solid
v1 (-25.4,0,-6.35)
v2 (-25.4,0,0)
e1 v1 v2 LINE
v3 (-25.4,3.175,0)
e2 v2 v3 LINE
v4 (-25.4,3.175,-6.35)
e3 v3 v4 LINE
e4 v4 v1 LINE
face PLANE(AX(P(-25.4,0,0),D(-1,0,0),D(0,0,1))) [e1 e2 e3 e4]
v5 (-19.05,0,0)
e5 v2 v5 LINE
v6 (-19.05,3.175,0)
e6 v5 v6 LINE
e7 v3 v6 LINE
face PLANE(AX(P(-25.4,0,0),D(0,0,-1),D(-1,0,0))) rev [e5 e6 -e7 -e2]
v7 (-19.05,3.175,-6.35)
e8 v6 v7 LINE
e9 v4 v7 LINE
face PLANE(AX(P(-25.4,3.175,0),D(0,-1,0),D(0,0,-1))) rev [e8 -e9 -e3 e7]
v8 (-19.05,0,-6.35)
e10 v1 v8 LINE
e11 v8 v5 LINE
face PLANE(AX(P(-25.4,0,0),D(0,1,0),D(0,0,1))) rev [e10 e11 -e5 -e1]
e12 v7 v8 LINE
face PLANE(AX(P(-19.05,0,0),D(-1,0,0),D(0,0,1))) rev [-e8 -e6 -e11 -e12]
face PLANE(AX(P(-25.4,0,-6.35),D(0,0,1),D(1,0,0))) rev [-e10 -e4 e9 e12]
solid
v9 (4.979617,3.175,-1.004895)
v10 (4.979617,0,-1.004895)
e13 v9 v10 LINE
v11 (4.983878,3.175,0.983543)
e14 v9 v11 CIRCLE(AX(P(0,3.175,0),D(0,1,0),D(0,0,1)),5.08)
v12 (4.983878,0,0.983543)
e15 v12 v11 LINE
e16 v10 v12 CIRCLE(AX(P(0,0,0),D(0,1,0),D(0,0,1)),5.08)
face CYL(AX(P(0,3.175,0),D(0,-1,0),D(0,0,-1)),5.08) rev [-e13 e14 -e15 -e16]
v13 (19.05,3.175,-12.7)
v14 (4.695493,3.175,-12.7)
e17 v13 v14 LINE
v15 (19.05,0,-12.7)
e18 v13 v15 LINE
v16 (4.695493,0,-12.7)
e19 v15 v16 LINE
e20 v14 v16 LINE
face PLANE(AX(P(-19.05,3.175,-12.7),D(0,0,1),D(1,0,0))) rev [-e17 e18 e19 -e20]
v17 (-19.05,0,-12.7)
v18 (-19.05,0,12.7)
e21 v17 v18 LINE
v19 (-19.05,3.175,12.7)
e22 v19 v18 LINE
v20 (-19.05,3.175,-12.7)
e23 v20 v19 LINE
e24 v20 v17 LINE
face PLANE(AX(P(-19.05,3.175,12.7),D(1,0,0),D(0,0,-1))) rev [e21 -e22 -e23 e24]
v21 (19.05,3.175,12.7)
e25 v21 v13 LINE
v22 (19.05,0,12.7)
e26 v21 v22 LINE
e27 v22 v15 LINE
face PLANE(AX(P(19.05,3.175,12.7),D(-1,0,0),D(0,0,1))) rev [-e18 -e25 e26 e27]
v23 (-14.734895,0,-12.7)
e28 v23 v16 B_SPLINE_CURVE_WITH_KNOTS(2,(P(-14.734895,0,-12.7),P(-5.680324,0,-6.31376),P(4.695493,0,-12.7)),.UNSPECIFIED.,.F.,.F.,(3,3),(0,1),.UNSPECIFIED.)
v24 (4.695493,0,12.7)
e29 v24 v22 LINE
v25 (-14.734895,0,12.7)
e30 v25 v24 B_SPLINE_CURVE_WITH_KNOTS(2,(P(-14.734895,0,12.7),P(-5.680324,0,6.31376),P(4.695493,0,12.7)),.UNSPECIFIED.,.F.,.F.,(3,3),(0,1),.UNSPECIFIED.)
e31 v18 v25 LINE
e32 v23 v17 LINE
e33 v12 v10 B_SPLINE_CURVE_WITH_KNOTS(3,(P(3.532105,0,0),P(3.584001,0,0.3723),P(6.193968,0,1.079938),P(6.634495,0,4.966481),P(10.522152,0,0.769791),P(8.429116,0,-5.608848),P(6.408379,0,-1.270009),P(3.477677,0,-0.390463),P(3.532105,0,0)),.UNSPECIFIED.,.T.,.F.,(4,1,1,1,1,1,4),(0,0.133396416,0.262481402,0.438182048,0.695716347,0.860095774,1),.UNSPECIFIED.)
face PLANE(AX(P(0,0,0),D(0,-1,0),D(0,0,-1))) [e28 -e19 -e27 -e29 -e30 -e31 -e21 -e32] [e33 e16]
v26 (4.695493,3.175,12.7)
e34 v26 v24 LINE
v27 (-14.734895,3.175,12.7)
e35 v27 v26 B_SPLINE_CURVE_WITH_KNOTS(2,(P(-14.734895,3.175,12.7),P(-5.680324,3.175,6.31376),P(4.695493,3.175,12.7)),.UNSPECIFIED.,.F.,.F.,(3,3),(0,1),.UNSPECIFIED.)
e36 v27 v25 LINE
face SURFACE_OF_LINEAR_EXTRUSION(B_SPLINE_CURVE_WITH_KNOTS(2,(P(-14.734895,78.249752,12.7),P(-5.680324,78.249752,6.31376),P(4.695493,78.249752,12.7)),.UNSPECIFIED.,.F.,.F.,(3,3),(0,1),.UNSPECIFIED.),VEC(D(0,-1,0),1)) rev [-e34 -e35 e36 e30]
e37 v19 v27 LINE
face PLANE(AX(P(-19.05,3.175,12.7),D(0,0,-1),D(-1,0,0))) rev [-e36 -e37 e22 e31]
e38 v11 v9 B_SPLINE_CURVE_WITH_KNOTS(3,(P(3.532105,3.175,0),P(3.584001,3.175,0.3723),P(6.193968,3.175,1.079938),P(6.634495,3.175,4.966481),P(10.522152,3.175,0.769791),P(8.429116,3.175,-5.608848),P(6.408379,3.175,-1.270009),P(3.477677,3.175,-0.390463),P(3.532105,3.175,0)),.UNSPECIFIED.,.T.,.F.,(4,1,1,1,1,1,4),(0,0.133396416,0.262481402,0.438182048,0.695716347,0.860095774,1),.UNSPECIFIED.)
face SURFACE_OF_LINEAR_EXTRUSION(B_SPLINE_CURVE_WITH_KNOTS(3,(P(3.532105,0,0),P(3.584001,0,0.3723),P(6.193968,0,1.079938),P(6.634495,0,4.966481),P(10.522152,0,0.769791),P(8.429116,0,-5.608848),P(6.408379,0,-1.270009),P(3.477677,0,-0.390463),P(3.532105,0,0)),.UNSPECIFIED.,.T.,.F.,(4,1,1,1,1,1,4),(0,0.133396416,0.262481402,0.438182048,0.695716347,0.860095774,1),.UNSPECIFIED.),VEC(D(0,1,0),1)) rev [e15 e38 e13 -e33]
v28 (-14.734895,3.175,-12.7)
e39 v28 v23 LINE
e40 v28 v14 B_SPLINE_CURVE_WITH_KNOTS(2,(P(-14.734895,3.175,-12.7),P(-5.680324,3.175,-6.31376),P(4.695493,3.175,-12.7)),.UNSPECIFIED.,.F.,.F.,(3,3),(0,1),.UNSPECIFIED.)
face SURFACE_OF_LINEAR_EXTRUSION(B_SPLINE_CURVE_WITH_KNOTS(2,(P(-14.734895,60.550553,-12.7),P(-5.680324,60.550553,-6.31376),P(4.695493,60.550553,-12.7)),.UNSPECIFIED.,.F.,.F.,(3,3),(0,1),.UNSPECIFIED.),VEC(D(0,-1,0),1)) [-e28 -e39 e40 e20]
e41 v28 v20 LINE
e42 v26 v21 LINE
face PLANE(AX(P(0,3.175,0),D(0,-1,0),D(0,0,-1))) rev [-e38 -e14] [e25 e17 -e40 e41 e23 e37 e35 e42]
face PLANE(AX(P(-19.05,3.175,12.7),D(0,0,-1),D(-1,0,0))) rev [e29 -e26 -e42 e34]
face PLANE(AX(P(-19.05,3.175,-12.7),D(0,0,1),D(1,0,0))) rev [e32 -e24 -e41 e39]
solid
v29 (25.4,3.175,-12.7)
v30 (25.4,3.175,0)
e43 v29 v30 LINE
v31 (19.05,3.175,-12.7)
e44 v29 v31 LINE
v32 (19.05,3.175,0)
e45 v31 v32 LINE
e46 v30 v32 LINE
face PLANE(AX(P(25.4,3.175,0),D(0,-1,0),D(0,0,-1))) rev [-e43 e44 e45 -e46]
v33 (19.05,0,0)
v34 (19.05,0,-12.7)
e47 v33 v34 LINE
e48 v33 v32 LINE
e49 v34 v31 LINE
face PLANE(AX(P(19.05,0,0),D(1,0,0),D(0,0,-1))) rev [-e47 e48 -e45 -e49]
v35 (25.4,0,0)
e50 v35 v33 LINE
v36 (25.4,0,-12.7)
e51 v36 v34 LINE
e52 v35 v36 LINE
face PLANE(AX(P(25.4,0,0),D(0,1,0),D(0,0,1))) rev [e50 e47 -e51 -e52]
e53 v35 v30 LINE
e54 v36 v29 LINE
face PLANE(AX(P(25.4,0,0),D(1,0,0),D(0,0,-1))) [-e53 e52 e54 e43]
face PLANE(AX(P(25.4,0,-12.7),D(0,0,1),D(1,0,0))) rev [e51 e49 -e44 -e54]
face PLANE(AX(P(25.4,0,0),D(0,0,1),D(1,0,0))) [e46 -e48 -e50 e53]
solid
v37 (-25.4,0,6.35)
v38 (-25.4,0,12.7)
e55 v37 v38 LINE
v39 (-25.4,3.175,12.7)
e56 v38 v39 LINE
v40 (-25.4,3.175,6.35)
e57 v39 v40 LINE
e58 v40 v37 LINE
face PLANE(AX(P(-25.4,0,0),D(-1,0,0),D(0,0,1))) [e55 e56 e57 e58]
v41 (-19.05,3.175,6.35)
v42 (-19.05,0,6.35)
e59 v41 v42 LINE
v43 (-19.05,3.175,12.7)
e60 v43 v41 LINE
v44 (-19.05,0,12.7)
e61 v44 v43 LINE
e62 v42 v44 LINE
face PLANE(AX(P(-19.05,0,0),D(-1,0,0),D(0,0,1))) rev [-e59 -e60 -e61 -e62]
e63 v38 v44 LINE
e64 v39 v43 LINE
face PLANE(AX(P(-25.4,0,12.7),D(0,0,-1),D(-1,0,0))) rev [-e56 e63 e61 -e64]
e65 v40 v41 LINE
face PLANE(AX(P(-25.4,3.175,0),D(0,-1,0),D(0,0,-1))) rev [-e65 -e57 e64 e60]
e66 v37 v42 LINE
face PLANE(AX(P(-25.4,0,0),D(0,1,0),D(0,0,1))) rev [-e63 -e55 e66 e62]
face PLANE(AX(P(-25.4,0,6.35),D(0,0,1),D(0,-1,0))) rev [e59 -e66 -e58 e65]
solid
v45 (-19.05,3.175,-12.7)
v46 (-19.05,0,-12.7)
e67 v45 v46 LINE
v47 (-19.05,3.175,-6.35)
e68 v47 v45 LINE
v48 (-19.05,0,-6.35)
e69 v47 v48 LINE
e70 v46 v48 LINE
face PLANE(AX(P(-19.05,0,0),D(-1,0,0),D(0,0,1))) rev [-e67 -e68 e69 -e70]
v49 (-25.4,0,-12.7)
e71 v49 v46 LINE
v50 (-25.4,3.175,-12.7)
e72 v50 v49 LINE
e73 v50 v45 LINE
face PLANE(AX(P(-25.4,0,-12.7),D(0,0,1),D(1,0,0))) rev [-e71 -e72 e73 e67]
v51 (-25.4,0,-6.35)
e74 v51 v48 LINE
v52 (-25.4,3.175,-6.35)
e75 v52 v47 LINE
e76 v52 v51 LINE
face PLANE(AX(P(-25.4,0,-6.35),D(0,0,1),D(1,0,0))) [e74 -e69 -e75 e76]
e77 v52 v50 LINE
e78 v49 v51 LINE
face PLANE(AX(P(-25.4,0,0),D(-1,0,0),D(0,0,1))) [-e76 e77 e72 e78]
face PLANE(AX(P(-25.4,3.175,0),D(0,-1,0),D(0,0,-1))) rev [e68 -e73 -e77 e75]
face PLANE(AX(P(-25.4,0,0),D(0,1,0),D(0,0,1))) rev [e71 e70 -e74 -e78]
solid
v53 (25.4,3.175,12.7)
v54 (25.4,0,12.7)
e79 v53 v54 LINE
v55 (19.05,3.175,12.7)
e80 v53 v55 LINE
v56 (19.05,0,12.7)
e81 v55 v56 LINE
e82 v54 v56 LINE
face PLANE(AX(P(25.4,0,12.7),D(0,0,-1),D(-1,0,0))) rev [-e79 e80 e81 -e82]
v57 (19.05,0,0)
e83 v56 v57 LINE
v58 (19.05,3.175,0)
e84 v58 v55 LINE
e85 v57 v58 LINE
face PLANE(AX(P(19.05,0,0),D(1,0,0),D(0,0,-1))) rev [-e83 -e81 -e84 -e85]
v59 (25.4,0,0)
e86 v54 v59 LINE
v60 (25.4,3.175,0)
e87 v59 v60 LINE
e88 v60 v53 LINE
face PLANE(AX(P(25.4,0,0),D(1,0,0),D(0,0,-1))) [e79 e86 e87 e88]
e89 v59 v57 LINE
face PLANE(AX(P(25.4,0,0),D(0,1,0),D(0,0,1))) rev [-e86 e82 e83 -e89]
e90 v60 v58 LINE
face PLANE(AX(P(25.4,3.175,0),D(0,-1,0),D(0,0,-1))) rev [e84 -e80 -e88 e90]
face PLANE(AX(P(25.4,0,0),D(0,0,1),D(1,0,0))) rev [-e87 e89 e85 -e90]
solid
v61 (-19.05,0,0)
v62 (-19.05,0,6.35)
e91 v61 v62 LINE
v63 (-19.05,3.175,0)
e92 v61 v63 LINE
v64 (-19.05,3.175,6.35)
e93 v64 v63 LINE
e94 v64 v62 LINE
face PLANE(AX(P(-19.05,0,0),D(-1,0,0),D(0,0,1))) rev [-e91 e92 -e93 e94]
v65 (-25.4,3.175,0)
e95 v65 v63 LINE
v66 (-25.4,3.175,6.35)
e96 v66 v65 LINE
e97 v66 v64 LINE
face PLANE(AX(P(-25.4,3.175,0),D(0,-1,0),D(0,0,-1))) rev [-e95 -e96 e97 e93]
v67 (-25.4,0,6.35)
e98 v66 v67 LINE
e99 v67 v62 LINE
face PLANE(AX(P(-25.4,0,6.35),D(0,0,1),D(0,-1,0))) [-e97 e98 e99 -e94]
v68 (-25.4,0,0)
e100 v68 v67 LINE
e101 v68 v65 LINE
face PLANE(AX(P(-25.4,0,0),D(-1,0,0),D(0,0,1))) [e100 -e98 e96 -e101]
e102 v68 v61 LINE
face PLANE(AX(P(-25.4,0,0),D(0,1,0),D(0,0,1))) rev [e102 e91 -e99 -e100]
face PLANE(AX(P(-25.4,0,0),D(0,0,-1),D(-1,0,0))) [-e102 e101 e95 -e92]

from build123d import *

# Parameters (mm, degrees)
SKETCH1_W           = 38.1
SKETCH1_H           = 25.4
SKETCH1_R           = 5.08
BOSS_EXTRUDE1_DEPTH = 3.175
SKETCH2_W           = 6.35
SKETCH2_H           = 3.175
BOSS_EXTRUDE3_DEPTH = 6.35
SKETCH2_4_W         = 6.35
SKETCH2_4_H         = 3.175
BOSS_EXTRUDE4_DEPTH = 6.35
SKETCH2_6_W         = 6.35
SKETCH2_6_H         = 3.175
BOSS_EXTRUDE6_DEPTH = 6.35
SKETCH2_7_W         = 6.35
SKETCH2_7_H         = 3.175
BOSS_EXTRUDE7_DEPTH = 6.35
SKETCH4_W           = 12.7
SKETCH4_H           = 3.175
BOSS_EXTRUDE8_DEPTH = 6.35
SKETCH4_3_W         = 12.7
SKETCH4_3_H         = 3.175
BOSS_EXTRUDE9_DEPTH = 6.35
CUT_EXTRUDE2_START  = -3.175
CUT_EXTRUDE2_DEPTH  = 3.175
CUT_EXTRUDE3_DEPTH  = 29.575000056


# Read off the part's stored shape, not the designer's step: Cut-Extrude2
with BuildPart() as part:
    # Sketch1 → Boss-Extrude1 (new body)
    with BuildSketch(Plane(origin=(0, 0, 0), x_dir=(1, 0, 0), z_dir=(0, 1, 0))):
        Rectangle(SKETCH1_W, SKETCH1_H)
        with Locations(Location((0, 0, 0), (0, 0, 270))):
            Circle(SKETCH1_R, mode=Mode.SUBTRACT)
    extrude(amount=BOSS_EXTRUDE1_DEPTH)

    # Cut-Extrude2 outline → Cut-Extrude2 (cut)
    with BuildSketch(Plane(origin=(0, 3.175, 0), x_dir=(1, 0, 0), z_dir=(0, 1, 0)).offset(CUT_EXTRUDE2_START)):
        with BuildLine():
            add(Edge.make_bspline(
                [(-14.734894962, -12.7), (-5.680324338, -6.31376032), (4.695493284, -12.7)],
                knots=[0, 0, 0, 1, 1, 1], degree=2))
            Line((-14.734894962, -12.7), (4.695493284, -12.7))
        make_face()
    cut_extrude2 = extrude(amount=CUT_EXTRUDE2_DEPTH, mode=Mode.SUBTRACT)

    # Mirror1: Cut-Extrude2 across plane
    add(cut_extrude2.mirror(Plane.XY), mode=Mode.SUBTRACT)

    # Sketch7 → Cut-Extrude3 (cut, through all)
    with BuildSketch(Plane(origin=(0, 3.175, 0), x_dir=(1, 0, 0), z_dir=(0, 1, 0))):
        with BuildLine():
            add(Edge.make_bspline(
                [(3.532104769, 0), (3.477676984, 0.390463167), (6.408378563, 1.270008565), (8.429115562, 5.608848412), (10.522151737, -0.769791386), (6.634495042, -4.966480622), (6.193967516, -1.079937843), (3.584000782, -0.372300314), (3.532104769, 0)],
                knots=[0, 0, 0, 0, 0.139904226, 0.304283653, 0.561817952, 0.737518598, 0.866603584, 1, 1, 1, 1], degree=3))
        make_face()
    extrude(amount=-CUT_EXTRUDE3_DEPTH, mode=Mode.SUBTRACT)


with BuildPart() as body_2:
    # Sketch2 → Boss-Extrude3 (new body)
    with BuildSketch(Plane.ZY.offset(19.05)):
        with Locations((-9.525, 1.5875)):
            Rectangle(SKETCH2_W, SKETCH2_H)
    extrude(amount=BOSS_EXTRUDE3_DEPTH)


with BuildPart() as body_3:
    # Sketch2<4> → Boss-Extrude4 (new body)
    with BuildSketch(Plane.ZY.offset(19.05)):
        with Locations((-3.175, 1.5875)):
            Rectangle(SKETCH2_4_W, SKETCH2_4_H)
    extrude(amount=BOSS_EXTRUDE4_DEPTH)


with BuildPart() as body_4:
    # Sketch2<6> → Boss-Extrude6 (new body)
    with BuildSketch(Plane.ZY.offset(19.05)):
        with Locations((3.175, 1.5875)):
            Rectangle(SKETCH2_6_W, SKETCH2_6_H)
    extrude(amount=BOSS_EXTRUDE6_DEPTH)


with BuildPart() as body_5:
    # Sketch2<7> → Boss-Extrude7 (new body)
    with BuildSketch(Plane.ZY.offset(19.05)):
        with Locations((9.525, 1.5875)):
            Rectangle(SKETCH2_7_W, SKETCH2_7_H)
    extrude(amount=BOSS_EXTRUDE7_DEPTH)


with BuildPart() as body_6:
    # Sketch4 → Boss-Extrude8 (new body)
    with BuildSketch(Plane(origin=(19.05, 0, 0), x_dir=(0, 0, -1), z_dir=(1, 0, 0))):
        with Locations((-6.35, 1.5875)):
            Rectangle(SKETCH4_W, SKETCH4_H)
    extrude(amount=BOSS_EXTRUDE8_DEPTH)


with BuildPart() as body_7:
    # Sketch4<3> → Boss-Extrude9 (new body)
    with BuildSketch(Plane(origin=(19.05, 0, 0), x_dir=(0, 0, -1), z_dir=(1, 0, 0))):
        with Locations((6.35, 1.5875)):
            Rectangle(SKETCH4_3_W, SKETCH4_3_H)
    extrude(amount=BOSS_EXTRUDE9_DEPTH)


solid = Compound([part.part, body_2.part, body_3.part, body_4.part, body_5.part, body_6.part, body_7.part])
